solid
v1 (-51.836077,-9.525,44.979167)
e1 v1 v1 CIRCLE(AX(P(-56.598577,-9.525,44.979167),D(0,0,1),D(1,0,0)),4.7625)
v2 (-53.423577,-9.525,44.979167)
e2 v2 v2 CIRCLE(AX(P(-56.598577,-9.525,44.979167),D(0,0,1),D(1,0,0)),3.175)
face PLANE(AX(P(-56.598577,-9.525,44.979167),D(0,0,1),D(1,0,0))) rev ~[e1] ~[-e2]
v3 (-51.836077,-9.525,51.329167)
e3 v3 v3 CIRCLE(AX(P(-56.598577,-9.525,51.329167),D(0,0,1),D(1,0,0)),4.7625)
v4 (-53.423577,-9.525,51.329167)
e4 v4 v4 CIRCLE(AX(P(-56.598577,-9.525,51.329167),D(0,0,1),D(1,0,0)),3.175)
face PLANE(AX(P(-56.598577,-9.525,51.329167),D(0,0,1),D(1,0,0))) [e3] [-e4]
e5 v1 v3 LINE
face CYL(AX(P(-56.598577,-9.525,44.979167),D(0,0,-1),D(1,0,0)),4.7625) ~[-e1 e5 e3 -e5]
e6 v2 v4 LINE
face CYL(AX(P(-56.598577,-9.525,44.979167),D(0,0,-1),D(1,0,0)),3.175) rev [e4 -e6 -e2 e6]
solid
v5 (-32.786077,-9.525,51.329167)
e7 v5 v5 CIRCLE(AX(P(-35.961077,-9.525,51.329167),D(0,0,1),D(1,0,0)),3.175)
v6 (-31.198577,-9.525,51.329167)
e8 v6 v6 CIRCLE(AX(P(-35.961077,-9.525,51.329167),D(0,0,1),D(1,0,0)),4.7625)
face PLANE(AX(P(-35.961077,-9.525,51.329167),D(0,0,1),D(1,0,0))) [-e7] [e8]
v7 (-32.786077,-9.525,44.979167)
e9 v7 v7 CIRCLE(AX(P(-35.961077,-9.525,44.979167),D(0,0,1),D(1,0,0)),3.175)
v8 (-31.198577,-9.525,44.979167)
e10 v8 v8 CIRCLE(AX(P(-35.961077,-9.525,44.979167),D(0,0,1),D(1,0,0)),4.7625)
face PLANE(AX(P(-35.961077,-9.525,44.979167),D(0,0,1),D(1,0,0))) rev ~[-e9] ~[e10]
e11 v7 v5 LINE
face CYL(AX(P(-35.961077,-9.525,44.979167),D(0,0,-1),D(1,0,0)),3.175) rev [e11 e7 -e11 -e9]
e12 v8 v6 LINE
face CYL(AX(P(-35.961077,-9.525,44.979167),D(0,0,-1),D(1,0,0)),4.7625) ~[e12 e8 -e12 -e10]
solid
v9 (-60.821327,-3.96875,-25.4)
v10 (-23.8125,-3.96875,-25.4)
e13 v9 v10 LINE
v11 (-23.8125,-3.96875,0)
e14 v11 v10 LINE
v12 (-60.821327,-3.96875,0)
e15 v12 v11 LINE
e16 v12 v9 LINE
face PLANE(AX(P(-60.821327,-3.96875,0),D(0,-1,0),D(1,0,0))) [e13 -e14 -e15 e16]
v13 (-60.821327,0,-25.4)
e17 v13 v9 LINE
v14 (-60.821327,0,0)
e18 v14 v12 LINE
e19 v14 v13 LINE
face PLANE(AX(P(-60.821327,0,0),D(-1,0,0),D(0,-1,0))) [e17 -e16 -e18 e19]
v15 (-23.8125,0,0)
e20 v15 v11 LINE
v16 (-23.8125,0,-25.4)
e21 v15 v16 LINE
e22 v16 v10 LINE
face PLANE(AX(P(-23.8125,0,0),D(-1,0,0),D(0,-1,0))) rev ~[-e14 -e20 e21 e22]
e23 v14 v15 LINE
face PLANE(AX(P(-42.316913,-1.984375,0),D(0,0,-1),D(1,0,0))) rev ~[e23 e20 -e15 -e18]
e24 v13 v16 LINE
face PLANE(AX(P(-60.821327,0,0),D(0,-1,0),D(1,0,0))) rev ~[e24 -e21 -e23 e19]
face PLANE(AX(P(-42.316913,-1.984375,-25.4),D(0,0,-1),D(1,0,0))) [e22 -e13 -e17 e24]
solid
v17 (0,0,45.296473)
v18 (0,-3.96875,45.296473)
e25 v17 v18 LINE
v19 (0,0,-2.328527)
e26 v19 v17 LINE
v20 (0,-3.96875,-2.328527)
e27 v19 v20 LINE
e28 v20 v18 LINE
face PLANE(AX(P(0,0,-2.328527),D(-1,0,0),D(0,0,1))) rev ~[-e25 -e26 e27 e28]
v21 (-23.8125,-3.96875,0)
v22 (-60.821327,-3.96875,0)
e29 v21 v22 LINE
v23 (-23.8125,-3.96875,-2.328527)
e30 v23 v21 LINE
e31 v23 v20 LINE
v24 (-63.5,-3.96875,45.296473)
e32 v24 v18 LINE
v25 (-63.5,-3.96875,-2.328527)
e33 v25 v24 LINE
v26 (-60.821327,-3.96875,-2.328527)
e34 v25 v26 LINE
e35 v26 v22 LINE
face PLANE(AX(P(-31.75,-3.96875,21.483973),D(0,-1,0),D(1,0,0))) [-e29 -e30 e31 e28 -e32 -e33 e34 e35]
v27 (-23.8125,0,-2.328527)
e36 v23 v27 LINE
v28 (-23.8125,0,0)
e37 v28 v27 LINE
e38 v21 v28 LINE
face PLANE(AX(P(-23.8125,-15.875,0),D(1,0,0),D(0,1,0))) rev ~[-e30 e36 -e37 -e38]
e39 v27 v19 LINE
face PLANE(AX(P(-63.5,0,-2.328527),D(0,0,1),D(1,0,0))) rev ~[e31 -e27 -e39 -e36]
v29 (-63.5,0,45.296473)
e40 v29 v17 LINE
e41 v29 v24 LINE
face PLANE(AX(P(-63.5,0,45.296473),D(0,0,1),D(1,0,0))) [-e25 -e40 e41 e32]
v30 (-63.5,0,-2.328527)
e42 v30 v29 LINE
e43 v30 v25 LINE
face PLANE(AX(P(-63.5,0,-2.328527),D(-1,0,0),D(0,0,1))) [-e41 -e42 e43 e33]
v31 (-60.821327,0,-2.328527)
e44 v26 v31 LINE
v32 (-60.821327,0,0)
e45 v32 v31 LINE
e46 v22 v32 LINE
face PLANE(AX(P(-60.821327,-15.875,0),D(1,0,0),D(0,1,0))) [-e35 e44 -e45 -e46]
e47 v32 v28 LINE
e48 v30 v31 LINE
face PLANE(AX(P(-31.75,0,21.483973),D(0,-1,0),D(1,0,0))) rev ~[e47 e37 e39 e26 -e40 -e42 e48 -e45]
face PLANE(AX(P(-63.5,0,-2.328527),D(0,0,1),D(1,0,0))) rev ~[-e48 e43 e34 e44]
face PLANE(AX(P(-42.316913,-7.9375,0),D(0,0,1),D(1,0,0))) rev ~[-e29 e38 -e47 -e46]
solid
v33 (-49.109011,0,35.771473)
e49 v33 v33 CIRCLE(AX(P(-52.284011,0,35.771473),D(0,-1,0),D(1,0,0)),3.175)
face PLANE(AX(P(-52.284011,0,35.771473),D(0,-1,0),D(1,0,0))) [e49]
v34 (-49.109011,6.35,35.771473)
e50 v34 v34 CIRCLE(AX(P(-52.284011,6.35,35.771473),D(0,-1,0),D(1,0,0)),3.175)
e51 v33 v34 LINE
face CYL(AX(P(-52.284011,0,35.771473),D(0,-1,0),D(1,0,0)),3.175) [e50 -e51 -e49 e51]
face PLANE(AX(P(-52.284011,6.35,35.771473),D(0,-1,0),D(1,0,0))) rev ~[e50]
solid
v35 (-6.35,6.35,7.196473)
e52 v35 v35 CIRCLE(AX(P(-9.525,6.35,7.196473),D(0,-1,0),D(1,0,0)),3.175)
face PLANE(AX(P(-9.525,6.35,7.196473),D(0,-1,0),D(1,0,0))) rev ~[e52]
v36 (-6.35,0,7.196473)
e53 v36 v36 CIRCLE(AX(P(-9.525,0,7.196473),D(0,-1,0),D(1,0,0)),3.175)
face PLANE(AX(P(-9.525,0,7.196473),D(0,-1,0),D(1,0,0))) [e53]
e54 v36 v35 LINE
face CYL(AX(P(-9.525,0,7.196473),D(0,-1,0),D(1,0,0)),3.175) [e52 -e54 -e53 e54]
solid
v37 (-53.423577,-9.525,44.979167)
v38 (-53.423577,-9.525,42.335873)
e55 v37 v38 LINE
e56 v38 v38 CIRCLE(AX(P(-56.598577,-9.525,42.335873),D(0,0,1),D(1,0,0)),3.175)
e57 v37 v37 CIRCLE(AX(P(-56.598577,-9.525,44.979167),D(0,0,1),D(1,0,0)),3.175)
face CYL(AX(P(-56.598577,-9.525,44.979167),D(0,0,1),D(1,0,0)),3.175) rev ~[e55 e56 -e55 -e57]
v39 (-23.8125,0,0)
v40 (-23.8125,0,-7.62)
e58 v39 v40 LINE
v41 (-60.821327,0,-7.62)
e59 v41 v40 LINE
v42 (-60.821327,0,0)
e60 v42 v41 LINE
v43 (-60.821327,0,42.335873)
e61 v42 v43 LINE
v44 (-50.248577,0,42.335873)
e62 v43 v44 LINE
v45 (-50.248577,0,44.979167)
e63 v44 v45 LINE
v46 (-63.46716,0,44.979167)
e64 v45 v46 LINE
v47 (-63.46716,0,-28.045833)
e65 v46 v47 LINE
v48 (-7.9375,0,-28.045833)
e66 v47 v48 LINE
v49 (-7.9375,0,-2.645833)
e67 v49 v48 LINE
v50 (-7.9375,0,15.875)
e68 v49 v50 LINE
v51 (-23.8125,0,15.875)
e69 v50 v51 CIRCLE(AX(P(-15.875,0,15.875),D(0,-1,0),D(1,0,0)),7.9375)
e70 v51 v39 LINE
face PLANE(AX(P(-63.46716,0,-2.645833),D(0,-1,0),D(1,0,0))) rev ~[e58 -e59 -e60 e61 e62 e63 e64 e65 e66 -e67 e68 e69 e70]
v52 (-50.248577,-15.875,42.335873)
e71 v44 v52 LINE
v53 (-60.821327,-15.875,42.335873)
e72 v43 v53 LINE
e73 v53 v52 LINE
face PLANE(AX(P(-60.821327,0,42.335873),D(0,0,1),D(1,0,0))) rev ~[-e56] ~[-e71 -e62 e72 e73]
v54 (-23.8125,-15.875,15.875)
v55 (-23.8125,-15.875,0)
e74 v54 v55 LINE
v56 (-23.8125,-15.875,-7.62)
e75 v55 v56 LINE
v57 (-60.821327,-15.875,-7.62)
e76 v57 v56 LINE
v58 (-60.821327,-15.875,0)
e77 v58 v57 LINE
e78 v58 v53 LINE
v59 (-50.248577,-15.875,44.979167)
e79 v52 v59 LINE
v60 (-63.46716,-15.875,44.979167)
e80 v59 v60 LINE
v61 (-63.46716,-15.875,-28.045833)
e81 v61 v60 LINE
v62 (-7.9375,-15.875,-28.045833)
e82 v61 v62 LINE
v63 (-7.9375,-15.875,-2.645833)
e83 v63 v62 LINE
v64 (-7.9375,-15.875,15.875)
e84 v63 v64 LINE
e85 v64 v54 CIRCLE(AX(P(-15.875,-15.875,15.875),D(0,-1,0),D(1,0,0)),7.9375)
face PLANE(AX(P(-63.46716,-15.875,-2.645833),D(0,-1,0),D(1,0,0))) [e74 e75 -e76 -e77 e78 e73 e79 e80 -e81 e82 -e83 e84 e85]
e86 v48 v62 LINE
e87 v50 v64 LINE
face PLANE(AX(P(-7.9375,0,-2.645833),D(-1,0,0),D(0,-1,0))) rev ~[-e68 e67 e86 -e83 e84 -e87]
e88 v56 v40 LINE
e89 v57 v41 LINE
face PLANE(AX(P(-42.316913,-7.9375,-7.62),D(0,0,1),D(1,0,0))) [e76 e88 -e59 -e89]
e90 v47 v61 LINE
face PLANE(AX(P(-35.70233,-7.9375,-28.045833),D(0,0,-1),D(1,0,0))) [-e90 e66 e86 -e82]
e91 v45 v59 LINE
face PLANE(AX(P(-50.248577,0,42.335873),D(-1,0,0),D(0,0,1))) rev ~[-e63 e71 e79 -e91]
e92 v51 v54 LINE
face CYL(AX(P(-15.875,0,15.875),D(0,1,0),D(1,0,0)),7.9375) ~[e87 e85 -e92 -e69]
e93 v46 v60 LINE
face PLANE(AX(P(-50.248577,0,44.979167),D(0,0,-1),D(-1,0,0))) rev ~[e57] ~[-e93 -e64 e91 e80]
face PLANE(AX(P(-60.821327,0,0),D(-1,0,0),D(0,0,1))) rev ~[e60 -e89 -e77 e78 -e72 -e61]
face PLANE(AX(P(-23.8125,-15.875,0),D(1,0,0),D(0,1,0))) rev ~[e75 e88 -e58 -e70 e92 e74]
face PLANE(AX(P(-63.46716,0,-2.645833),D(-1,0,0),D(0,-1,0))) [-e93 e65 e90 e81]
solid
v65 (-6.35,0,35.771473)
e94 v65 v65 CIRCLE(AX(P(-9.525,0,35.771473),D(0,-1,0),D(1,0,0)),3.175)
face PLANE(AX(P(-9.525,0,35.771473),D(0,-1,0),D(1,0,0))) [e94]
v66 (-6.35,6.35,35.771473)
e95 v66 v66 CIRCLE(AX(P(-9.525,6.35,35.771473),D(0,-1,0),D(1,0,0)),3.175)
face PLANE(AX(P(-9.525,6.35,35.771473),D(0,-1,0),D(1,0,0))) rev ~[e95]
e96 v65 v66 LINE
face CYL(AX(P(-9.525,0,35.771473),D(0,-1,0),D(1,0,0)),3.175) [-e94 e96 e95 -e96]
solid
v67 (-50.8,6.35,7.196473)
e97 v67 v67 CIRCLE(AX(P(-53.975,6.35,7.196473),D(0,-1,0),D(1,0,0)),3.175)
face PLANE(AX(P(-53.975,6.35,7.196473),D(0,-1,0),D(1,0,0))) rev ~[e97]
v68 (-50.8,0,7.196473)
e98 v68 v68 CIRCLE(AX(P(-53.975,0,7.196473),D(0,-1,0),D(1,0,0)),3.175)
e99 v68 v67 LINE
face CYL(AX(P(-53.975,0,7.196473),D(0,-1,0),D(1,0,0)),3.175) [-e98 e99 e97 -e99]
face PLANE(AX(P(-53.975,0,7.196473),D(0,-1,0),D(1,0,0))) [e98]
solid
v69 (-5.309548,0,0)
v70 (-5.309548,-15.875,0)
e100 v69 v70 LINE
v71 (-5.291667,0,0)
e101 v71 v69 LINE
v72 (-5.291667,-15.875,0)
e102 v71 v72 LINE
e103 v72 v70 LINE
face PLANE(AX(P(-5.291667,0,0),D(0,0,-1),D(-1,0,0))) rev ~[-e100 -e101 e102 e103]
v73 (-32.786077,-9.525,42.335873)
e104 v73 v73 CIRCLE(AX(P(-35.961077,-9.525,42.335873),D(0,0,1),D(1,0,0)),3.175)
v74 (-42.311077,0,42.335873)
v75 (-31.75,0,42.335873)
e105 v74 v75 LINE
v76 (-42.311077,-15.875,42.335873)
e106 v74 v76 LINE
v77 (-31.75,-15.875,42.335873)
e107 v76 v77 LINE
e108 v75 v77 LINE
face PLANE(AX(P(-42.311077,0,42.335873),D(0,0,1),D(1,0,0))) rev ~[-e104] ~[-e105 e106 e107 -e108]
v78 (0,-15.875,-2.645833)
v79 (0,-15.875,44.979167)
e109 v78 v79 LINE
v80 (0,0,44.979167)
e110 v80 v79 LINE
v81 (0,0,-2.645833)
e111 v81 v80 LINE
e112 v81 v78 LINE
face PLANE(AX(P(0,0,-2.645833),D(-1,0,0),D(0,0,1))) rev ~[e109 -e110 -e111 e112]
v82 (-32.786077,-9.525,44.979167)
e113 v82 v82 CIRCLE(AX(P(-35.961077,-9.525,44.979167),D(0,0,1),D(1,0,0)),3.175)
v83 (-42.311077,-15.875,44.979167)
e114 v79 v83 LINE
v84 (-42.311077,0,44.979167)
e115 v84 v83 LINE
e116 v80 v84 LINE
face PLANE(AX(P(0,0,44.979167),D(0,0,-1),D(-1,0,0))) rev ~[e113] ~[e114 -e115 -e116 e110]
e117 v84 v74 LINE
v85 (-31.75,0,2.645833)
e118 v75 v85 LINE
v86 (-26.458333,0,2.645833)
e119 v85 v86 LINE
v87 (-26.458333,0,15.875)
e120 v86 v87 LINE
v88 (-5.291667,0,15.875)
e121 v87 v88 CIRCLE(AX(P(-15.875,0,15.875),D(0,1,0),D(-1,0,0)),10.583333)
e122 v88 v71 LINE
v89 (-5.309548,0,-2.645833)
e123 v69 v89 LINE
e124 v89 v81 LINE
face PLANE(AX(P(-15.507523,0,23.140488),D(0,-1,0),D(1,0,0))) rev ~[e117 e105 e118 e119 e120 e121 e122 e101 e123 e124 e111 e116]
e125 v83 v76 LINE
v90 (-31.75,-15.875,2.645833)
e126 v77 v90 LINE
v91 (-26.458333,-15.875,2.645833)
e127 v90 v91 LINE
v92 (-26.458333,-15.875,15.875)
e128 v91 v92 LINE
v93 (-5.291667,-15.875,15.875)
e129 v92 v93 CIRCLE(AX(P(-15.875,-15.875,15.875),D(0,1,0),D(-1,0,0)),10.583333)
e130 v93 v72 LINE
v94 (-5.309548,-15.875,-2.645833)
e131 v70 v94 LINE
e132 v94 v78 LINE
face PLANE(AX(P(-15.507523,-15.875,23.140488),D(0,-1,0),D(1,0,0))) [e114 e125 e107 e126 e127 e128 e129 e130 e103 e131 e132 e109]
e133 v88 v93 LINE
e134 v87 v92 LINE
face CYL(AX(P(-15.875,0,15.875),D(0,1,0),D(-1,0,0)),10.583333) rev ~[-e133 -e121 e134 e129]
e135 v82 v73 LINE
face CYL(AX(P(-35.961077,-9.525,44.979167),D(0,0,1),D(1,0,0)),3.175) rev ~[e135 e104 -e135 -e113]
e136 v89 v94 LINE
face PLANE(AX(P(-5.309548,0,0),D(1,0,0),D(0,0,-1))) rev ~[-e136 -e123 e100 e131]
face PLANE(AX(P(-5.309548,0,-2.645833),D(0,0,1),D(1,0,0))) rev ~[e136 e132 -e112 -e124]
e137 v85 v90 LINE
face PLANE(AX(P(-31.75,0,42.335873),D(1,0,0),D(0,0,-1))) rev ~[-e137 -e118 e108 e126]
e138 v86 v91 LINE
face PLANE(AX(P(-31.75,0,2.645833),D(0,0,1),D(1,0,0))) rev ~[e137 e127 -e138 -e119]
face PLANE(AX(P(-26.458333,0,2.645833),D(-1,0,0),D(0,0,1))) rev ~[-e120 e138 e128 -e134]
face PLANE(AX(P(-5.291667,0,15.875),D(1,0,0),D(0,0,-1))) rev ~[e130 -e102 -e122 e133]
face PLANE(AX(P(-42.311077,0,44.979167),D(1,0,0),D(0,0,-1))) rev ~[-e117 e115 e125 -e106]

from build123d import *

# Parameters (mm, degrees)
F1_DEPTH  = 15.875
F0_W      = 2.6458333332
F0_H      = 42.3358732487
F2_W      = 63.5
F2_H      = 47.625
F2_R      = 3.175
F3_DEPTH  = 3.96875
F4_DEPTH  = 6.35
F5_R      = 4.7625
F5_R_2    = 3.175
F6_DEPTH  = 6.35
F7_R      = 3.175
F8_DEPTH  = 25.4
F9_W      = 55.5296598673
F9_H      = 15.875
F10_DEPTH = 25.4
F11_W     = 37.0088265341
F11_H     = 15.875
F12_DEPTH = 7.62
F13_W     = 37.0088265341
F13_H     = 3.96875
F14_DEPTH = 25.4


# Not quite as in the source:
# - a feature names something its author has since deleted; it is built from what else it names


with BuildPart() as f1:
    # F0 (on Front) → F1 (new body)
    with BuildSketch(Plane.XZ):
        with BuildLine():
            Line((0, 44.979166582), (-31.75, 44.979166582))
            Line((-31.75, 44.979166582), (-31.75, 42.3358732487))
            Line((-31.75, 42.3358732487), (-31.75, 2.6458333332))
            Line((-31.75, 2.6458333332), (-26.4583333333, 2.6458333332))
            Line((-26.4583333333, 2.6458333332), (-26.4583333333, 15.875))
            ThreePointArc((-26.4583333333, 15.875), (-15.875, 26.4583333333), (-5.2916666667, 15.875))
            Line((-5.2916666667, 15.875), (-5.2916666667, 0))
            Line((-5.2916666667, 0), (0, 0))
            Line((0, 0), (0, 44.979166582))
        make_face()
        Polygon((0, -2.6458333333), (0, 0), (-5.2916666667, 0), (-5.309548229, 0), (-5.309548229, -2.6458333333), align=None)
        Polygon((-31.75, 42.3358732487), (-31.75, 44.979166582), (-34.3958333316, 44.979166582), (-37.0416664956, 44.979166582), (-42.3110765377, 44.979166582), (-42.3110765377, 42.3358732487), (-37.0416664956, 42.3358732487), (-34.3958333316, 42.3358732487), align=None)
    extrude(amount=F1_DEPTH)


with BuildPart() as f1b:
    # F0 (on Front) → F1, piece 2 (new body)
    with BuildSketch(Plane.XZ):
        with BuildLine():
            Line((-23.8125, 0), (-7.9375, 0))
            Line((-7.9375, 0), (-7.9375, 15.875))
            ThreePointArc((-7.9375, 15.875), (-15.875, 23.8125), (-23.8125, 15.875))
            Line((-23.8125, 15.875), (-23.8125, 0))
        make_face()
        Polygon((-26.4583333333, 0), (-31.75, 0), (-60.8213265341, 0), (-63.4671598673, 0), (-63.4671598673, -2.6458333333), (-7.9375, -2.6458333333), (-7.9375, 0), (-23.8125, 0), align=None)
        with Locations((-62.1442432007, 21.1679366243)):
            Rectangle(F0_W, F0_H)
        Polygon((-50.2485765377, 42.3358732487), (-50.2485765377, 44.979166582), (-55.5296598693, 44.979166582), (-58.175493201, 44.979166582), (-63.4671598673, 44.979166582), (-63.4671598673, 42.3358732487), (-60.8213265341, 42.3358732487), (-58.175493201, 42.3358732487), (-55.5296598693, 42.3358732487), align=None)
    extrude(amount=F1_DEPTH)


with BuildPart() as f3:
    # F2 (on Front) → F3 (new body)
    with BuildSketch(Plane.XZ):
        with Locations((-31.75, 21.4839725468)):
            Rectangle(F2_W, F2_H)
        with Locations((-53.975, 7.1964725468)):
            Circle(F2_R, mode=Mode.SUBTRACT)
        with Locations((-9.525, 7.1964725468)):
            Circle(F2_R, mode=Mode.SUBTRACT)
        with Locations((-52.284011212, 35.7714725468)):
            Circle(F2_R, mode=Mode.SUBTRACT)
        with Locations((-9.525, 35.7714725468)):
            Circle(F2_R, mode=Mode.SUBTRACT)
        with Locations((-52.284011212, 35.7714725468)):
            Circle(F2_R)
        with Locations((-53.975, 7.1964725468)):
            Circle(F2_R)
        with Locations((-9.525, 7.1964725468)):
            Circle(F2_R)
        with Locations((-9.525, 35.7714725468)):
            Circle(F2_R)
    extrude(amount=F3_DEPTH)


with BuildPart() as f4:
    # F2 (on Front) → F4 (new body)
    with BuildSketch(Plane.XZ):
        with Locations((-9.525, 35.7714725468)):
            Circle(F2_R)
    extrude(amount=-F4_DEPTH)


with BuildPart() as f4b:
    # F2 (on Front) → F4, piece 2 (new body)
    with BuildSketch(Plane.XZ):
        with Locations((-52.284011212, 35.7714725468)):
            Circle(F2_R)
    extrude(amount=-F4_DEPTH)


with BuildPart() as f4c:
    # F2 (on Front) → F4, piece 3 (new body)
    with BuildSketch(Plane.XZ):
        with Locations((-9.525, 7.1964725468)):
            Circle(F2_R)
    extrude(amount=-F4_DEPTH)


with BuildPart() as f4d:
    # F2 (on Front) → F4, piece 4 (new body)
    with BuildSketch(Plane.XZ):
        with Locations((-53.975, 7.1964725468)):
            Circle(F2_R)
    extrude(amount=-F4_DEPTH)


with BuildPart() as f6:
    # F5 (on face) → F6 (new body)
    with BuildSketch(Plane.XY.offset(44.979166582)):
        with Locations((-56.5985765377, -9.525)):
            Circle(F5_R)
        with Locations((-56.5985765377, -9.525)):
            Circle(F5_R_2, mode=Mode.SUBTRACT)
    extrude(amount=F6_DEPTH)


with BuildPart() as f6b:
    # F5 (on face) → F6, piece 2 (new body)
    with BuildSketch(Plane.XY.offset(44.979166582)):
        with Locations((-35.9610765377, -9.525)):
            Circle(F5_R)
        with Locations((-35.9610765377, -9.525)):
            Circle(F5_R_2, mode=Mode.SUBTRACT)
    extrude(amount=F6_DEPTH)


with BuildPart() as f8_tool:
    # F7 (on face) → F8 (new body)
    with BuildSketch(Plane.XY.offset(44.979166582)):
        with Locations((-35.9610765377, -9.525)):
            Circle(F7_R)
        with Locations((-56.5985765377, -9.525)):
            Circle(F7_R)
    extrude(amount=-F8_DEPTH)


with BuildPart() as f1_1:
    add(f1.part)

    # F8: cut by f8_tool
    add(f8_tool.part, mode=Mode.SUBTRACT)


with BuildPart() as f1b_1:
    add(f1b.part)

    # F8: cut by f8_tool
    add(f8_tool.part, mode=Mode.SUBTRACT)

    # F9 (on face) → F10 (join)
    with BuildSketch(Plane(origin=(0, 0, -2.6458333333), x_dir=(1, 0, 0), z_dir=(0, 0, -1))):
        with Locations((-35.7023299336, 7.9375)):
            Rectangle(F9_W, F9_H)
    extrude(amount=F10_DEPTH)


with BuildPart() as f12_tool:
    # F11 (on face) → F12 (new body)
    with BuildSketch(Plane.XY):
        with Locations((-42.3169132671, -7.9375)):
            Rectangle(F11_W, F11_H)
    extrude(amount=-F12_DEPTH)


with BuildPart() as f1b_2:
    add(f1b_1.part)

    # F12: cut by f12_tool
    add(f12_tool.part, mode=Mode.SUBTRACT)


with BuildPart() as f3_1:
    add(f3.part)

    # F12: cut by f12_tool
    add(f12_tool.part, mode=Mode.SUBTRACT)


with BuildPart() as f14:
    # F13 (on face) → F14 (new body)
    with BuildSketch(Plane(origin=(0, 0, 0), x_dir=(1, 0, 0), z_dir=(0, 0, -1))):
        with Locations((-42.3169132671, 1.984375)):
            Rectangle(F13_W, F13_H)
    extrude(amount=F14_DEPTH)


solid = Compound([f4.part, f4b.part, f4c.part, f4d.part, f6.part, f6b.part, f1_1.part, f1b_2.part, f3_1.part, f14.part])
